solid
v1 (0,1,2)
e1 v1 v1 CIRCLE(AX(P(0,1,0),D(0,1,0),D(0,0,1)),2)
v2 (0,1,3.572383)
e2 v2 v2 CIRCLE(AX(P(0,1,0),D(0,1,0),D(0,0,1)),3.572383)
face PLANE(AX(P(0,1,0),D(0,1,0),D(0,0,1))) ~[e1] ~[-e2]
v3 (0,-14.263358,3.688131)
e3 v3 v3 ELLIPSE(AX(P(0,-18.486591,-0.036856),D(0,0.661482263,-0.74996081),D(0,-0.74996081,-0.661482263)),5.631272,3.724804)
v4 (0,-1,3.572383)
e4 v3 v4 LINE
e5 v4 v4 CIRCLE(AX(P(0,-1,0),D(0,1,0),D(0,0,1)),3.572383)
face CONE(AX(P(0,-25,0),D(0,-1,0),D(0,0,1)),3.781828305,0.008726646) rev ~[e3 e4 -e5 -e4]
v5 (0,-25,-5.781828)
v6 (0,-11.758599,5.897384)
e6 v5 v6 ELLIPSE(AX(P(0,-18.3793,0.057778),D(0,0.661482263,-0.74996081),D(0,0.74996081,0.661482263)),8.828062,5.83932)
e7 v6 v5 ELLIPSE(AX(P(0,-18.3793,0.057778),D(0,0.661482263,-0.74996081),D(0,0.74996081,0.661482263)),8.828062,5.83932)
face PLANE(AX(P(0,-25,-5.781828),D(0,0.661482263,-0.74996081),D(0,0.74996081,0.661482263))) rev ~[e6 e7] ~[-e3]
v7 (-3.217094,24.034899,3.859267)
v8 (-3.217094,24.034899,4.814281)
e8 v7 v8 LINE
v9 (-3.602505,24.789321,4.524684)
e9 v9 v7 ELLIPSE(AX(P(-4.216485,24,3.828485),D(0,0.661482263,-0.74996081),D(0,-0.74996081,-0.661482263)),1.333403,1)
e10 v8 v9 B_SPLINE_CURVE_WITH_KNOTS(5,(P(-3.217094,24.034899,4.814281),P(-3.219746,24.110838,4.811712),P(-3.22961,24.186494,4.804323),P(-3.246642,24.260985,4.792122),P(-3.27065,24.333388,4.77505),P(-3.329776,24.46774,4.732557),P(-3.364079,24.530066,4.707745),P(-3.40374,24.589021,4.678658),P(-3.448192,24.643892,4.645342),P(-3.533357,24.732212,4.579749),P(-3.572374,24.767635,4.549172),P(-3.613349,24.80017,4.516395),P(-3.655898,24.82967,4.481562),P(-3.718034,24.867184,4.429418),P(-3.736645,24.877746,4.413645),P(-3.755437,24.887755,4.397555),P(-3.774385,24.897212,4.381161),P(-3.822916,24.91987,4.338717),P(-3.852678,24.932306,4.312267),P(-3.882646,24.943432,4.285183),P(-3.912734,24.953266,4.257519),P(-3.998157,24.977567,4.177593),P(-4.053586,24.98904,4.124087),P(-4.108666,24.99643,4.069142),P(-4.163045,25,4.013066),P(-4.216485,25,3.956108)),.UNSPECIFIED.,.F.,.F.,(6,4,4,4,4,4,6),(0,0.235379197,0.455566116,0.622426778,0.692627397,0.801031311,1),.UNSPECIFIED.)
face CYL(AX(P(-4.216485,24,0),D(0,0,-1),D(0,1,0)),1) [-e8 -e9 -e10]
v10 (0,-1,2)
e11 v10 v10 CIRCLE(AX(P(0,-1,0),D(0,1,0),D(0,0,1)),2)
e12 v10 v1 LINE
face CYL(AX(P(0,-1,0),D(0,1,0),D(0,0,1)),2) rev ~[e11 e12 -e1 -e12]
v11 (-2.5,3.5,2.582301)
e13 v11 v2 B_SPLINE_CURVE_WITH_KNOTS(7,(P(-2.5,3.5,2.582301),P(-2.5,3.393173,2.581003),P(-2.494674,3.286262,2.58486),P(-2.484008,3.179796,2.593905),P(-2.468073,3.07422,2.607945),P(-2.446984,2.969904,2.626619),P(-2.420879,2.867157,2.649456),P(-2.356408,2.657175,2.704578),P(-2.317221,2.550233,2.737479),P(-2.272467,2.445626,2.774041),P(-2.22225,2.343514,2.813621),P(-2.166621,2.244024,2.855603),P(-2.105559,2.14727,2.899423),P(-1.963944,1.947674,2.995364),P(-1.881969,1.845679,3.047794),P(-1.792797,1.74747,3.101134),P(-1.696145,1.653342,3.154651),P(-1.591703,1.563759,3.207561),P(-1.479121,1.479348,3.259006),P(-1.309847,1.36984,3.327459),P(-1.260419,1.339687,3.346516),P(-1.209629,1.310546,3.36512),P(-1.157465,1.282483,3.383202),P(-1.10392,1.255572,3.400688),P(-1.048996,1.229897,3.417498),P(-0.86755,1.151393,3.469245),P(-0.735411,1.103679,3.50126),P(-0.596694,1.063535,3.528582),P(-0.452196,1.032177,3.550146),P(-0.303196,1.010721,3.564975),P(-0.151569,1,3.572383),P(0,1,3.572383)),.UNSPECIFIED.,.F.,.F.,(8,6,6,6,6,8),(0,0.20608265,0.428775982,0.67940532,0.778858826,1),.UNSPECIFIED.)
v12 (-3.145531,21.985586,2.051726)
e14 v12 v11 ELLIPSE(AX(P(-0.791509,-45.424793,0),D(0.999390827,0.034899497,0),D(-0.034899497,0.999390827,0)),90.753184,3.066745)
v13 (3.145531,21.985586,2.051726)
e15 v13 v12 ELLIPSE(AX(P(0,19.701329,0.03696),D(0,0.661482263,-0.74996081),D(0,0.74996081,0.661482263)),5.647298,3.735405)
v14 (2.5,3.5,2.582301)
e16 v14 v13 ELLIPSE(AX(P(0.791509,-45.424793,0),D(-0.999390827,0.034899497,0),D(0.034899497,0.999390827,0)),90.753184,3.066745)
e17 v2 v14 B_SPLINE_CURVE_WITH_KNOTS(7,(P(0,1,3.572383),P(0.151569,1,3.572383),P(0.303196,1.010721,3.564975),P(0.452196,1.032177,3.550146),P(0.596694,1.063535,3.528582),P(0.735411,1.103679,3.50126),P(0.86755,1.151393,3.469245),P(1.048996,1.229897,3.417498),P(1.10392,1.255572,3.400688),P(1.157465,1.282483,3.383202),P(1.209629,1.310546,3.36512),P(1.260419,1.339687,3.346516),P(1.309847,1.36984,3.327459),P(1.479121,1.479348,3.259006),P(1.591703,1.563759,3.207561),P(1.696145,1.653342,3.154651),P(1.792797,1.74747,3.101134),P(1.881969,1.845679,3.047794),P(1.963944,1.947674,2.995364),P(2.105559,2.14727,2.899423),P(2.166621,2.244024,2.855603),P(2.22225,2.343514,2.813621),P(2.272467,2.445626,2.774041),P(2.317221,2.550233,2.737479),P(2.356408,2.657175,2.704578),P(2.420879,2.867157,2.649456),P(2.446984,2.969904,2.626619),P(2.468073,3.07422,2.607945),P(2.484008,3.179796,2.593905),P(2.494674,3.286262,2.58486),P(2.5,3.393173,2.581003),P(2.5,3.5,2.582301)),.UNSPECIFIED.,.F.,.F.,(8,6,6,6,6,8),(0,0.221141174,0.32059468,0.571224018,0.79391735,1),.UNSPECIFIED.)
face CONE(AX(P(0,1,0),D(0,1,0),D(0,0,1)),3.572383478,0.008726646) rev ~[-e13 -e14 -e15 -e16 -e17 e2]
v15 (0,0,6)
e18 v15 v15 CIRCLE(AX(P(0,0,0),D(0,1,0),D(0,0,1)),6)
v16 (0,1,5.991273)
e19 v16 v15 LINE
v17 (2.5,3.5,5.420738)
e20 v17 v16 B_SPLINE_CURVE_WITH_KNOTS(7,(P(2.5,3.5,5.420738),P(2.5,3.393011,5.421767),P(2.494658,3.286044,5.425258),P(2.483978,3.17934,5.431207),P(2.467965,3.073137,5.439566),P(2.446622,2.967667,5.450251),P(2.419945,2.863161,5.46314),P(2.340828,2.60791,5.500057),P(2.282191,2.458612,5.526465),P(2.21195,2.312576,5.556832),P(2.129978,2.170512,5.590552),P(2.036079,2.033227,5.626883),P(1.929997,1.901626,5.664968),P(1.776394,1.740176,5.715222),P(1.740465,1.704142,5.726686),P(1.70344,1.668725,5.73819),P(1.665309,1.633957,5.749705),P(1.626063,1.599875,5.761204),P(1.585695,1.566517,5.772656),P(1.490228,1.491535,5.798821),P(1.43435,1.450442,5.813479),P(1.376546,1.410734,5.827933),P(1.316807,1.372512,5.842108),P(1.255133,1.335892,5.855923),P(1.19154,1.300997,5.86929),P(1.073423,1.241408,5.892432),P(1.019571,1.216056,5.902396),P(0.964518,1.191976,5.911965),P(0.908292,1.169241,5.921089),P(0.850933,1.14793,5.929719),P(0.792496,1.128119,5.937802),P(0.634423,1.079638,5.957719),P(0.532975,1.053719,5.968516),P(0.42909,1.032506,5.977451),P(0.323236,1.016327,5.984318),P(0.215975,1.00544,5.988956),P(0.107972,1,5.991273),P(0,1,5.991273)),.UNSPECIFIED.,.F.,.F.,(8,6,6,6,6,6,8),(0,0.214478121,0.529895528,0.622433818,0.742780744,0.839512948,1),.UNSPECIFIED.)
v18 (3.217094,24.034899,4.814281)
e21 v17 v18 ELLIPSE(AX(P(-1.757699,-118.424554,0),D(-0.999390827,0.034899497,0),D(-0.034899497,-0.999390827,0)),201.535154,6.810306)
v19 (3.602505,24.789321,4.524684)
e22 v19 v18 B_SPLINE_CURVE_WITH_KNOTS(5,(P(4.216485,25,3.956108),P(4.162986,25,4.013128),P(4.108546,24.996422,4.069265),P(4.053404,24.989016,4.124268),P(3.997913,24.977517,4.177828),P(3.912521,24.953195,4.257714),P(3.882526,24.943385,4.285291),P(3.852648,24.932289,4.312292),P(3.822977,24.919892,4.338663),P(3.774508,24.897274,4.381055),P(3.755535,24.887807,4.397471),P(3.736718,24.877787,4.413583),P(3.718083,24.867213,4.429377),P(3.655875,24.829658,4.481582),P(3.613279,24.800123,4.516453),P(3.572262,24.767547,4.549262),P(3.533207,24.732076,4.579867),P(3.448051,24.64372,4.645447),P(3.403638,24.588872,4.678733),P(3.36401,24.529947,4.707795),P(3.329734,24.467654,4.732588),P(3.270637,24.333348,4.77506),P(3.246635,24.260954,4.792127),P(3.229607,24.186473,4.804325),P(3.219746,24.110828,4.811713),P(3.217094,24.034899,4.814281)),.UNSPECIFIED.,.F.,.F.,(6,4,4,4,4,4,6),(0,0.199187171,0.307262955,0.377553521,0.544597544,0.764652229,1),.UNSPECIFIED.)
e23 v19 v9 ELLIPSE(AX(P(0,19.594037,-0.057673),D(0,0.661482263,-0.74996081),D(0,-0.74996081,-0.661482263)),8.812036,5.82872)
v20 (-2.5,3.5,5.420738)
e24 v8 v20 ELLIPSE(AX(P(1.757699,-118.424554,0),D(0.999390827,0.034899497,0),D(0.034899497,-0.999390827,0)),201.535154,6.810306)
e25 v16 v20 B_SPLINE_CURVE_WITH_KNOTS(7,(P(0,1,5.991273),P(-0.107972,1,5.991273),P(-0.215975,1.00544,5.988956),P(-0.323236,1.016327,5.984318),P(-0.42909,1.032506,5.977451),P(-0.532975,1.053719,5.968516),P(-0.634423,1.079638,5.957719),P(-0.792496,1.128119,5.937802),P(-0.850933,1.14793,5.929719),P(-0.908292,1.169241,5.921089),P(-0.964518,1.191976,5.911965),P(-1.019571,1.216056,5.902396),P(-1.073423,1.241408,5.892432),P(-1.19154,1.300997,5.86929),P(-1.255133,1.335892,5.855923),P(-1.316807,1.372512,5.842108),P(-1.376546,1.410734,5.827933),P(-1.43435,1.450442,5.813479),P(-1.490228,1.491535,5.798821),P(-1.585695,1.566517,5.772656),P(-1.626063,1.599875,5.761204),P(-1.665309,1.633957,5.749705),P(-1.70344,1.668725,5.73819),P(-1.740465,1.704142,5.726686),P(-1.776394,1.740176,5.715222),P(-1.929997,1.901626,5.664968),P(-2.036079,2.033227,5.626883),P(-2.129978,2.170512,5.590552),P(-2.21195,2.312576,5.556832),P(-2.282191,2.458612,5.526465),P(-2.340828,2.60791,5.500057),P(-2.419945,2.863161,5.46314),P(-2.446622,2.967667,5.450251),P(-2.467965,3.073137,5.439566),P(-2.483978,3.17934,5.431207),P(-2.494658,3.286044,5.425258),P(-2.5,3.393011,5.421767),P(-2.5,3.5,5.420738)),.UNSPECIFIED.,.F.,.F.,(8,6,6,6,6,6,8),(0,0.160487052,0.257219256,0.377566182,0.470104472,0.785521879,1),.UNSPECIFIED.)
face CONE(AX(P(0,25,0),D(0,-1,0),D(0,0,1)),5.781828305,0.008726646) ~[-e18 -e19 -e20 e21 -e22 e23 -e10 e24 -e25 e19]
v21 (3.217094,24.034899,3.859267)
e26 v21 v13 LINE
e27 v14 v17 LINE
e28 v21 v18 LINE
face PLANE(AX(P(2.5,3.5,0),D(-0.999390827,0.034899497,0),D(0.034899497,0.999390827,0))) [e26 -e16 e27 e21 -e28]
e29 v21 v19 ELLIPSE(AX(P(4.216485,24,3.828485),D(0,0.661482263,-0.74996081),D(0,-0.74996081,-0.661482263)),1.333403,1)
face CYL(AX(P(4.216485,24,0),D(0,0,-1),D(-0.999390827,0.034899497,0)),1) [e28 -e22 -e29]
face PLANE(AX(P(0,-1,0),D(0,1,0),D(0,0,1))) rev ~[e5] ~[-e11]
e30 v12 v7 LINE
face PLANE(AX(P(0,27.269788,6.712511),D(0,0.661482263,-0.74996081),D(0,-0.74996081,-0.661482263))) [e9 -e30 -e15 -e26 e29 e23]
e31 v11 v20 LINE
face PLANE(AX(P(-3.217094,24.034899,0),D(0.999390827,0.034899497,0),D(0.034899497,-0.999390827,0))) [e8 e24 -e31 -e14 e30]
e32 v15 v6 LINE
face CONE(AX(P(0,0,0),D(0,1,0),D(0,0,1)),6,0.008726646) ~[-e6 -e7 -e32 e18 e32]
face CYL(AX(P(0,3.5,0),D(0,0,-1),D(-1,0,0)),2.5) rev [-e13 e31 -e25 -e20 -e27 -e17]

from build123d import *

# Parameters (mm, degrees)
F3_DEPTH = 25
F5_DEPTH = 12.5


# Not quite as in the source:
# - a feature of the source that left no trace in its solid (it failed there, or was rolled back) is left out


with BuildPart() as f1:
    # F0 (on Right) → F1 (revolve)
    with BuildSketch(Plane.YZ):
        Polygon((-1, 2), (0, 2), (1, 2), (1, 3.5723834783), (25, 3.7818283052), (25, 5.7818283052), (0, 6), (-25, 5.7818283052), (-25, 3.7818283052), (-1, 3.5723834783), align=None)
    revolve(axis=Axis((0, 180.1521787086, 0), (0, 1, 0)))

    # F2 (on Top) → F3 (cut)
    with BuildSketch(Plane.XY):
        with BuildLine():
            Line((-3.2170944919, 24.0348994967), (-2.5, 3.5))
            ThreePointArc((-2.5, 3.5), (0, 1), (2.5, 3.5))
            Line((2.5, 3.5), (3.2170944919, 24.0348994967))
            ThreePointArc((3.2170944919, 24.0348994967), (3.5218269484, 24.7193398003), (4.2164853189, 25))
            Line((4.2164853189, 25), (5.7818283052, 25))
            Line((5.7818283052, 25), (5.7818283052, 27.9599502683))
            Line((5.7818283052, 27.9599502683), (-5.9923287481, 27.9599502683))
            Line((-5.9923287481, 27.9599502683), (-5.7818283052, 25))
            Line((-5.7818283052, 25), (-4.2164853189, 25))
            ThreePointArc((-4.2164853189, 25), (-3.5218269484, 24.7193398003), (-3.2170944919, 24.0348994967))
        make_face()
    extrude(amount=F3_DEPTH, mode=Mode.SUBTRACT)

    # F4 (on Right) → F5 (cut, symmetric)
    with BuildSketch(Plane.YZ):
        Polygon((32.3949936356, 6.6679690088), (27.2697879307, 6.7125111288), (9.7397706777, -8.7493574537), (32.3949936356, -8.9470665892), align=None)
        Polygon((-29.6528312787, -5.7412236618), (-25, -5.7818283052), (-3.2005671173, 13.4457606663), (-29.6528312787, 14.9152847007), align=None)
    extrude(amount=F5_DEPTH, both=True, mode=Mode.SUBTRACT)


solid = f1.part
